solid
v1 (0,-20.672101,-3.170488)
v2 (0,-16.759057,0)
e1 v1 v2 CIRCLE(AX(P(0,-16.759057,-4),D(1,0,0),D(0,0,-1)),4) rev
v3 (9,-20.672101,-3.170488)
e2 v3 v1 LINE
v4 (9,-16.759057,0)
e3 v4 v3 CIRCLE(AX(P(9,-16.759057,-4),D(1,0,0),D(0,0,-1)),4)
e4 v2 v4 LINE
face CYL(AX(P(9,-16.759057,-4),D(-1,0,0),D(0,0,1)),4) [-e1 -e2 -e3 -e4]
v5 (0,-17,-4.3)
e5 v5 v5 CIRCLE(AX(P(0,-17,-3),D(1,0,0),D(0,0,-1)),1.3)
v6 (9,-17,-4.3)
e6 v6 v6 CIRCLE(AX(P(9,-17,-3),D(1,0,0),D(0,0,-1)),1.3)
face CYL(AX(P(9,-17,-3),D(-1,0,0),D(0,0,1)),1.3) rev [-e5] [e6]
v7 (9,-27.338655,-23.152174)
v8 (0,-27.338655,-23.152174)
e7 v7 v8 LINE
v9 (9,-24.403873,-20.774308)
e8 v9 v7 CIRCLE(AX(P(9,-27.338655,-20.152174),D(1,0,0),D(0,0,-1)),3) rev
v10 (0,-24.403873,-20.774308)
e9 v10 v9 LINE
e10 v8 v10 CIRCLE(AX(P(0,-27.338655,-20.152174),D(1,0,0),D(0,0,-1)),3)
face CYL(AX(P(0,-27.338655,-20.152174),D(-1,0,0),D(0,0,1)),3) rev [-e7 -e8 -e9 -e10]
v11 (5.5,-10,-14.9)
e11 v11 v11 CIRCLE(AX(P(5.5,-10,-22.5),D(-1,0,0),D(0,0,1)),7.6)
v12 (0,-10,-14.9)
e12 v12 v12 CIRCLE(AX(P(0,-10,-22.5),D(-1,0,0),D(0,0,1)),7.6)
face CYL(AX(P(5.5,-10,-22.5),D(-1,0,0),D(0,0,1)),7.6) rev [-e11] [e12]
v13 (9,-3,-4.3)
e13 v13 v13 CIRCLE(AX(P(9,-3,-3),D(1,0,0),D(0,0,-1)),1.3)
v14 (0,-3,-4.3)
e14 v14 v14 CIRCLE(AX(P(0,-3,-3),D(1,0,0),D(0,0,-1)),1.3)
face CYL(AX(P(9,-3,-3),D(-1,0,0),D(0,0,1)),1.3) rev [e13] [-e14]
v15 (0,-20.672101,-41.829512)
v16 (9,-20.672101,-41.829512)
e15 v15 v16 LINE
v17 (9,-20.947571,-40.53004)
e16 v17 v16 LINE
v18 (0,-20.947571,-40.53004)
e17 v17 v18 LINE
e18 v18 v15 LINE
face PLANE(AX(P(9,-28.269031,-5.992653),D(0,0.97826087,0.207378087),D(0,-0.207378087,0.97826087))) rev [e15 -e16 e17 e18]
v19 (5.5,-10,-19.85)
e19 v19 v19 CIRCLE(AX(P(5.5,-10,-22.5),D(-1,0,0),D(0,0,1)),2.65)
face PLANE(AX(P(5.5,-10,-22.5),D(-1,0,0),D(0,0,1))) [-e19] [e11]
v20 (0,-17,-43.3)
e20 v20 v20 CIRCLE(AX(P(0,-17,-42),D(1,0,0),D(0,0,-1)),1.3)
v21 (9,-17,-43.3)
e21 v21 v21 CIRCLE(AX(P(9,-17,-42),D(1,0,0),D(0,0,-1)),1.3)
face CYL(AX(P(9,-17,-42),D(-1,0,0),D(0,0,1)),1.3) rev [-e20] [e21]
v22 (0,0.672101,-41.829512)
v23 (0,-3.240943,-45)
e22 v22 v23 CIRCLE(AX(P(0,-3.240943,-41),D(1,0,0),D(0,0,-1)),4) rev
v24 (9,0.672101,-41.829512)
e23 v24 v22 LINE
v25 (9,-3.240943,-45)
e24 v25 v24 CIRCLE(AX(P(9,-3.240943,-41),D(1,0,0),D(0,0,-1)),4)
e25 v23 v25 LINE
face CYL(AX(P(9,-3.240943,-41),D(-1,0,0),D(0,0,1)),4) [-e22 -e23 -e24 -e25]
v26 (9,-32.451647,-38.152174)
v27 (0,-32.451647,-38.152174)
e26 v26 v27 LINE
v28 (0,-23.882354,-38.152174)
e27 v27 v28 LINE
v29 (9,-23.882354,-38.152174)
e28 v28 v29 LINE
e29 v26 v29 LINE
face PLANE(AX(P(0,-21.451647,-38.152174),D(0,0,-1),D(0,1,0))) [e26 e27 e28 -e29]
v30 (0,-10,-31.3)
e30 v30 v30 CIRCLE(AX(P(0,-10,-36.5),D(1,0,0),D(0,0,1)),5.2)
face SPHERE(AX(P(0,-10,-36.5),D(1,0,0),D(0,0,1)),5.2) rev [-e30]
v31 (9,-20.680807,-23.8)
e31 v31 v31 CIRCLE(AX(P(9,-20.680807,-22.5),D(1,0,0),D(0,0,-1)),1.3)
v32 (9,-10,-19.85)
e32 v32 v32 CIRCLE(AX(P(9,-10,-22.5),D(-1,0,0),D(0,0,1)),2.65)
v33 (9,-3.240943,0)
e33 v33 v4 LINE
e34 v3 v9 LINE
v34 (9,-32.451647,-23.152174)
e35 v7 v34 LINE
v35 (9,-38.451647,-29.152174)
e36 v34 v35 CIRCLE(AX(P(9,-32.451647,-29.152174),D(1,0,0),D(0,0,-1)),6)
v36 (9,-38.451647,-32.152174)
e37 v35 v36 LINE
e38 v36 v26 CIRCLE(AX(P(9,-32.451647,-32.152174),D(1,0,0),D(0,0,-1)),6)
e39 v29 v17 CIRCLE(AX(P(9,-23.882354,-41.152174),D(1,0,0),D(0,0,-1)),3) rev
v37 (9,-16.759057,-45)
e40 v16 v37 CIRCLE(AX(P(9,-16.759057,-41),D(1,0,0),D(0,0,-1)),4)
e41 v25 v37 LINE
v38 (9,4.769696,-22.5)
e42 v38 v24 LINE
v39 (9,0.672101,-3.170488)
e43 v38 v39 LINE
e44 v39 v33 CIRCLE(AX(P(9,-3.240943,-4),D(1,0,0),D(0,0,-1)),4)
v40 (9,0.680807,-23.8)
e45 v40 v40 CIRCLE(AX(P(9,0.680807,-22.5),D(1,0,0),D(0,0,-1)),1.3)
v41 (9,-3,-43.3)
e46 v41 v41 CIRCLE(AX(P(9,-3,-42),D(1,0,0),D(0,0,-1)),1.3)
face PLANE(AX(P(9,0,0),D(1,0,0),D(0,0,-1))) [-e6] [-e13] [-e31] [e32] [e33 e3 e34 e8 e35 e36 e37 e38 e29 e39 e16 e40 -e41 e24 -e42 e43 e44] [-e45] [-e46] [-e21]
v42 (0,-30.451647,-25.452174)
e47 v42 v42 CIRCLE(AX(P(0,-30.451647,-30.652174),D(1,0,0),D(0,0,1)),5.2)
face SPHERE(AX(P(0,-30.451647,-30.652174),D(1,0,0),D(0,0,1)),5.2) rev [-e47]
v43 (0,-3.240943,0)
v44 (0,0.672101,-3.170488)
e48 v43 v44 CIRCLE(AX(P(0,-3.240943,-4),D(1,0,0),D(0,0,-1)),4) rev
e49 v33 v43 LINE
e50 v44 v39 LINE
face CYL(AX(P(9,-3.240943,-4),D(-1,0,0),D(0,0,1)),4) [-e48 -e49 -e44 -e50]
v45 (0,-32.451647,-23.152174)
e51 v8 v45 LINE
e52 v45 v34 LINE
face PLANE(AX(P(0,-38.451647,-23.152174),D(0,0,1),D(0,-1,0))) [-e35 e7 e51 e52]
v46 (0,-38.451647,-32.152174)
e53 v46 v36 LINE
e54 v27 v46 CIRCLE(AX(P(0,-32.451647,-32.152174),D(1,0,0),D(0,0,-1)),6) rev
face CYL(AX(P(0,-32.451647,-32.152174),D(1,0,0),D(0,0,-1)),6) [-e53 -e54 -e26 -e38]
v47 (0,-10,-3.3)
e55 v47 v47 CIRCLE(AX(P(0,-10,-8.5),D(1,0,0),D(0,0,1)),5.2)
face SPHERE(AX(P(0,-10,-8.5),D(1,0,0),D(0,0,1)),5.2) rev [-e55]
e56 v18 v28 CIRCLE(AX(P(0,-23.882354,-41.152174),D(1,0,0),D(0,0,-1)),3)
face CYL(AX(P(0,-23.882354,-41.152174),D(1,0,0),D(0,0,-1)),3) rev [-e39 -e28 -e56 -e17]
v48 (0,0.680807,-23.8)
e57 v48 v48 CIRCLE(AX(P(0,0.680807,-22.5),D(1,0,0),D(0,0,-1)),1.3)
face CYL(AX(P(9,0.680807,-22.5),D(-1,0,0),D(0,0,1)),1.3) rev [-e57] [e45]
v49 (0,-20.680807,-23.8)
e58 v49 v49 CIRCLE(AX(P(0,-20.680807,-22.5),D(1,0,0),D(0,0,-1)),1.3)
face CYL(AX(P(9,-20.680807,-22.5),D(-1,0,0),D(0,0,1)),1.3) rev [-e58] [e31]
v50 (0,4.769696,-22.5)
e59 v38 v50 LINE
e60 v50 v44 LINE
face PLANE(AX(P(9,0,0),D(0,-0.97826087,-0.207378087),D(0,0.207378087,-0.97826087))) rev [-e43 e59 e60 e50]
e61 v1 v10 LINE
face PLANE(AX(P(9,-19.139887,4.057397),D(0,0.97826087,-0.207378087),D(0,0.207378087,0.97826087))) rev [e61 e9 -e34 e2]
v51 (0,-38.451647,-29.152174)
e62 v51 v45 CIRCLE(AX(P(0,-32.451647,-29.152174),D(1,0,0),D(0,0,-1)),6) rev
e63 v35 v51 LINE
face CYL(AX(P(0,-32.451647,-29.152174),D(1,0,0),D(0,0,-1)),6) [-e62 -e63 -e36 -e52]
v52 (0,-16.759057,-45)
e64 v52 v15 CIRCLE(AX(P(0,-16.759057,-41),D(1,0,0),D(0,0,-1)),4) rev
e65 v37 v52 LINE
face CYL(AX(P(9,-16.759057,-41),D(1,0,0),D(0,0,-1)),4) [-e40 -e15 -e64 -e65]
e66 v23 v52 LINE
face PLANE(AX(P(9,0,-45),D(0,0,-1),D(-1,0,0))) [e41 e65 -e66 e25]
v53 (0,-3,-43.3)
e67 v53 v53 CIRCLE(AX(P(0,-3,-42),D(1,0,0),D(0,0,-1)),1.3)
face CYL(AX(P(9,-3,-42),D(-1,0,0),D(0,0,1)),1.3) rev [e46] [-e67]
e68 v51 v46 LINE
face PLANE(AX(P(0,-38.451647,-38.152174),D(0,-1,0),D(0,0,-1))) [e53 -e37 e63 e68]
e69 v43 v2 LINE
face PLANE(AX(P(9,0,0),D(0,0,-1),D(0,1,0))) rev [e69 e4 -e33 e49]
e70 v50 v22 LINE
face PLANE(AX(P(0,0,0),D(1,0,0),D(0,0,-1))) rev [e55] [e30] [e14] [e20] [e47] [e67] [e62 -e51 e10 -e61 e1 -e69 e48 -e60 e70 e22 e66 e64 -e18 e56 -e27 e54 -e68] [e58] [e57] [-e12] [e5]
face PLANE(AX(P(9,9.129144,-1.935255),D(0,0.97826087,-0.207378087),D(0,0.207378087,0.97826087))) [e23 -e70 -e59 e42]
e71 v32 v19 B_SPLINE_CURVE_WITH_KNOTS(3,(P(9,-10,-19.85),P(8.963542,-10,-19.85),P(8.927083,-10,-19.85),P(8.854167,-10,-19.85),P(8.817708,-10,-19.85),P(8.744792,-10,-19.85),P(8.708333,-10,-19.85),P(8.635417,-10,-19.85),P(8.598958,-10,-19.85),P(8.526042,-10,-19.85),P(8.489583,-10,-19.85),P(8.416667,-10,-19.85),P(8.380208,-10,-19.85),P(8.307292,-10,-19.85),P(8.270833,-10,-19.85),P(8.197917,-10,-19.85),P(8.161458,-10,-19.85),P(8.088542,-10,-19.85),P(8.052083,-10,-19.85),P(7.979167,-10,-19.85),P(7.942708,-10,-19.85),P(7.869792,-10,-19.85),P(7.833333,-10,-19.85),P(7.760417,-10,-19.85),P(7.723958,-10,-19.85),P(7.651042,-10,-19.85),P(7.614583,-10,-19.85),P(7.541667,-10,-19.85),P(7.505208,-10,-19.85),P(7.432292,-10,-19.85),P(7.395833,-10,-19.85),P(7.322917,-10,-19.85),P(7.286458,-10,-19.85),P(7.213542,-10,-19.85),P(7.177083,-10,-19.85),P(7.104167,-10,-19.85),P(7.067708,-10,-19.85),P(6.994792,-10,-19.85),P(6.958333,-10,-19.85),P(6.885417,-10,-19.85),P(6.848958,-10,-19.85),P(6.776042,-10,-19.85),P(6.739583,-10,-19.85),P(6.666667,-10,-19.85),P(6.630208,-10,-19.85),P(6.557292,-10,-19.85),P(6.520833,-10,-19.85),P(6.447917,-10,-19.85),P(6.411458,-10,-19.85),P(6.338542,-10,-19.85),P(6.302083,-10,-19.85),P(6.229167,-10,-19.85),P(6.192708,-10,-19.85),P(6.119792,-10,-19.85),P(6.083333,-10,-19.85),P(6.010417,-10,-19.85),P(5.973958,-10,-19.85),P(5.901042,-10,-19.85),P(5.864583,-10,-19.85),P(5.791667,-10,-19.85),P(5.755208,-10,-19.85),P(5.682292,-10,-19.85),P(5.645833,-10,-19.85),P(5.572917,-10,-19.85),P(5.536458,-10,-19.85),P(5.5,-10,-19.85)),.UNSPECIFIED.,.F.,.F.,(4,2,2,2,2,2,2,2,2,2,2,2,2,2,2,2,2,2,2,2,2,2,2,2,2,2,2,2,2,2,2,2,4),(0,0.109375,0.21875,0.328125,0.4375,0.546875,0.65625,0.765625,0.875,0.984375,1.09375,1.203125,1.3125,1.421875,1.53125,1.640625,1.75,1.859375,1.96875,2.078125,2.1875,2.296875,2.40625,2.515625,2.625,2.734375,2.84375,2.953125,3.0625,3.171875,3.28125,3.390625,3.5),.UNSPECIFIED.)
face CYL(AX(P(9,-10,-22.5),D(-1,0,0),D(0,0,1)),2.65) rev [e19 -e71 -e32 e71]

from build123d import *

# Parameters (mm, degrees)
SKETCH1_R           = 1.3
BOSS_EXTRUDE1_DEPTH = 9
CUT_REVOLVE3_ANGLE  = 180
SKETCH8_R           = 7.6
CUT_EXTRUDE4_DEPTH  = 5.5
SKETCH9_R           = 2.65
CUT_EXTRUDE5_DEPTH  = 52.660312042
BOSS_EXTRUDE7_DEPTH = 9
CUT_REVOLVE4_ANGLE  = 180
FILLET1_R           = 6
FILLET2_R           = 4
FILLET3_R           = 3
FILLET4_R           = 3


with BuildPart() as part:
    # Sketch1 → Boss-Extrude1 (new body)
    with BuildSketch(Plane(origin=(0, 0, 0), x_dir=(0, 0, -1), z_dir=(1, 0, 0))):
        Polygon((0, -20), (22.5, -24.769696007), (45, -20), (45, 0), (22.5, 4.769696007), (0, 0), align=None)
        with Locations((22.5, -20.680807118)):
            Circle(SKETCH1_R, mode=Mode.SUBTRACT)
        with Locations((22.5, 0.680807118)):
            Circle(SKETCH1_R, mode=Mode.SUBTRACT)
        with Locations((42, -17)):
            Circle(SKETCH1_R, mode=Mode.SUBTRACT)
        with Locations((3, -17)):
            Circle(SKETCH1_R, mode=Mode.SUBTRACT)
        with Locations((3, -3)):
            Circle(SKETCH1_R, mode=Mode.SUBTRACT)
        with Locations((42, -3)):
            Circle(SKETCH1_R, mode=Mode.SUBTRACT)
    extrude(amount=BOSS_EXTRUDE1_DEPTH)

    # Sketch7 → Cut-Revolve3 (revolve, cut)
    with BuildSketch(Plane.ZY):
        with BuildLine():
            Line((-41.7, -10), (-31.3, -10))
            ThreePointArc((-31.3, -10), (-36.5, -4.8), (-41.7, -10))
        make_face()
        with BuildLine():
            Line((-13.7, -10), (-3.3, -10))
            ThreePointArc((-3.3, -10), (-8.5, -4.8), (-13.7, -10))
        make_face()
    revolve(axis=Axis((0, -10, -41.7), (0, 0, -1)), revolution_arc=CUT_REVOLVE3_ANGLE, mode=Mode.SUBTRACT)

    # Sketch8 → Cut-Extrude4 (cut)
    with BuildSketch(Plane.ZY):
        with Locations((-22.5, -10)):
            Circle(SKETCH8_R)
    extrude(amount=-CUT_EXTRUDE4_DEPTH, mode=Mode.SUBTRACT)

    # Sketch9 → Cut-Extrude5 (cut, through all)
    with BuildSketch(Plane.ZY.offset(-5.5)):
        with Locations((-22.5, -10)):
            Circle(SKETCH9_R)
    extrude(amount=-CUT_EXTRUDE5_DEPTH, mode=Mode.SUBTRACT)

    # Sketch16 → Boss-Extrude7 (add)
    with BuildSketch(Plane(origin=(9, 0, 0), x_dir=(0, 0, -1), z_dir=(1, 0, 0))):
        Polygon((38.152173913, -21.451646611), (38.152173913, -38.451646611), (23.152173913, -38.451646611), (23.152173913, -24.631443949), align=None)
    extrude(amount=-BOSS_EXTRUDE7_DEPTH)

    # Sketch17 → Cut-Revolve4 (revolve, cut)
    with BuildSketch(Plane.ZY):
        with BuildLine():
            Line((-25.452173913, -30.451646611), (-35.852173913, -30.451646611))
            ThreePointArc((-35.852173913, -30.451646611), (-30.652173913, -25.251646611), (-25.452173913, -30.451646611))
        make_face()
    revolve(axis=Axis((0, -30.451646611, -25.452173913), (0, 0, -1)), revolution_arc=CUT_REVOLVE4_ANGLE, mode=Mode.SUBTRACT)

    # Fillet1
    fillet1_edges = [part.edges().sort_by_distance(p)[0] for p in [
        (4.5, -38.451646611, -38.152173913),
        (4.5, -38.451646611, -23.152173913),
    ]]
    fillet(fillet1_edges, radius=FILLET1_R)

    # Fillet2
    fillet2_edges = [part.edges().sort_by_distance(p)[0] for p in [
        (4.5, -20, -45),
        (4.5, -20, 0),
        (4.5, 0, 0),
        (4.5, 0, -45),
    ]]
    fillet(fillet2_edges, radius=FILLET2_R)

    # Fillet3
    # the kernel refuses this fillet: 3 mm, written as the material it adds along each edge
    with BuildSketch(Plane(origin=(9, -24.631443949, -23.152173913), x_dir=(0, -0.20737808726534282, 0.9782608695650501), z_dir=(-1, 0, 0))) as fillet3_piece_1:
        with BuildLine():
            CenterArc((3.350740319, -1.340055458), FILLET3_R, 153.468795145, 38.499950409)
            Line((0.41595771, -1.96218972), (0.357262058, -1.974632405))
            Line((0.357262058, -1.974632405), (-0.058695652, -0.012442685))
            Line((-0.058695652, -0.012442685), (0, 0.06))
            ThreePointArc((0, 0.06), (0.333333333, 0.06), (0.612985194, 0.026801109))
            Line((0.612985194, 0.026801109), (0.666666667, 0))
        make_face()
    extrude(amount=9)
    with BuildSketch(Plane(origin=(9, -21.451646611, -38.152173913), x_dir=(0, -1, 0), z_dir=(-1, 0, 0))) as fillet3_piece_2:
        with BuildLine():
            CenterArc((FILLET3_R * 0.810235733018, -FILLET3_R), FILLET3_R, 90, 78.031254445)
            Line((-FILLET3_R * 0.168025136547, -FILLET3_R * 0.792621912735), (-FILLET3_R * 0.187590353938, -FILLET3_R * 0.78847435099))
            Line((-FILLET3_R * 0.187590353938, -FILLET3_R * 0.78847435099), (-FILLET3_R * 0.0162047146604, FILLET3_R * 0.02))
            Line((-FILLET3_R * 0.0162047146604, FILLET3_R * 0.02), (FILLET3_R * 0.810235733018, FILLET3_R * 0.02))
            Line((FILLET3_R * 0.810235733018, FILLET3_R * 0.02), (FILLET3_R * 0.810235733018, 0))
        make_face()
    extrude(amount=9)

    # Fillet4
    fillet4_edges = [part.edges().sort_by_distance(p)[0] for p in [
        (4.5, -24.769696007, -22.5),
    ]]
    fillet(fillet4_edges, radius=FILLET4_R)


solid = part.part
